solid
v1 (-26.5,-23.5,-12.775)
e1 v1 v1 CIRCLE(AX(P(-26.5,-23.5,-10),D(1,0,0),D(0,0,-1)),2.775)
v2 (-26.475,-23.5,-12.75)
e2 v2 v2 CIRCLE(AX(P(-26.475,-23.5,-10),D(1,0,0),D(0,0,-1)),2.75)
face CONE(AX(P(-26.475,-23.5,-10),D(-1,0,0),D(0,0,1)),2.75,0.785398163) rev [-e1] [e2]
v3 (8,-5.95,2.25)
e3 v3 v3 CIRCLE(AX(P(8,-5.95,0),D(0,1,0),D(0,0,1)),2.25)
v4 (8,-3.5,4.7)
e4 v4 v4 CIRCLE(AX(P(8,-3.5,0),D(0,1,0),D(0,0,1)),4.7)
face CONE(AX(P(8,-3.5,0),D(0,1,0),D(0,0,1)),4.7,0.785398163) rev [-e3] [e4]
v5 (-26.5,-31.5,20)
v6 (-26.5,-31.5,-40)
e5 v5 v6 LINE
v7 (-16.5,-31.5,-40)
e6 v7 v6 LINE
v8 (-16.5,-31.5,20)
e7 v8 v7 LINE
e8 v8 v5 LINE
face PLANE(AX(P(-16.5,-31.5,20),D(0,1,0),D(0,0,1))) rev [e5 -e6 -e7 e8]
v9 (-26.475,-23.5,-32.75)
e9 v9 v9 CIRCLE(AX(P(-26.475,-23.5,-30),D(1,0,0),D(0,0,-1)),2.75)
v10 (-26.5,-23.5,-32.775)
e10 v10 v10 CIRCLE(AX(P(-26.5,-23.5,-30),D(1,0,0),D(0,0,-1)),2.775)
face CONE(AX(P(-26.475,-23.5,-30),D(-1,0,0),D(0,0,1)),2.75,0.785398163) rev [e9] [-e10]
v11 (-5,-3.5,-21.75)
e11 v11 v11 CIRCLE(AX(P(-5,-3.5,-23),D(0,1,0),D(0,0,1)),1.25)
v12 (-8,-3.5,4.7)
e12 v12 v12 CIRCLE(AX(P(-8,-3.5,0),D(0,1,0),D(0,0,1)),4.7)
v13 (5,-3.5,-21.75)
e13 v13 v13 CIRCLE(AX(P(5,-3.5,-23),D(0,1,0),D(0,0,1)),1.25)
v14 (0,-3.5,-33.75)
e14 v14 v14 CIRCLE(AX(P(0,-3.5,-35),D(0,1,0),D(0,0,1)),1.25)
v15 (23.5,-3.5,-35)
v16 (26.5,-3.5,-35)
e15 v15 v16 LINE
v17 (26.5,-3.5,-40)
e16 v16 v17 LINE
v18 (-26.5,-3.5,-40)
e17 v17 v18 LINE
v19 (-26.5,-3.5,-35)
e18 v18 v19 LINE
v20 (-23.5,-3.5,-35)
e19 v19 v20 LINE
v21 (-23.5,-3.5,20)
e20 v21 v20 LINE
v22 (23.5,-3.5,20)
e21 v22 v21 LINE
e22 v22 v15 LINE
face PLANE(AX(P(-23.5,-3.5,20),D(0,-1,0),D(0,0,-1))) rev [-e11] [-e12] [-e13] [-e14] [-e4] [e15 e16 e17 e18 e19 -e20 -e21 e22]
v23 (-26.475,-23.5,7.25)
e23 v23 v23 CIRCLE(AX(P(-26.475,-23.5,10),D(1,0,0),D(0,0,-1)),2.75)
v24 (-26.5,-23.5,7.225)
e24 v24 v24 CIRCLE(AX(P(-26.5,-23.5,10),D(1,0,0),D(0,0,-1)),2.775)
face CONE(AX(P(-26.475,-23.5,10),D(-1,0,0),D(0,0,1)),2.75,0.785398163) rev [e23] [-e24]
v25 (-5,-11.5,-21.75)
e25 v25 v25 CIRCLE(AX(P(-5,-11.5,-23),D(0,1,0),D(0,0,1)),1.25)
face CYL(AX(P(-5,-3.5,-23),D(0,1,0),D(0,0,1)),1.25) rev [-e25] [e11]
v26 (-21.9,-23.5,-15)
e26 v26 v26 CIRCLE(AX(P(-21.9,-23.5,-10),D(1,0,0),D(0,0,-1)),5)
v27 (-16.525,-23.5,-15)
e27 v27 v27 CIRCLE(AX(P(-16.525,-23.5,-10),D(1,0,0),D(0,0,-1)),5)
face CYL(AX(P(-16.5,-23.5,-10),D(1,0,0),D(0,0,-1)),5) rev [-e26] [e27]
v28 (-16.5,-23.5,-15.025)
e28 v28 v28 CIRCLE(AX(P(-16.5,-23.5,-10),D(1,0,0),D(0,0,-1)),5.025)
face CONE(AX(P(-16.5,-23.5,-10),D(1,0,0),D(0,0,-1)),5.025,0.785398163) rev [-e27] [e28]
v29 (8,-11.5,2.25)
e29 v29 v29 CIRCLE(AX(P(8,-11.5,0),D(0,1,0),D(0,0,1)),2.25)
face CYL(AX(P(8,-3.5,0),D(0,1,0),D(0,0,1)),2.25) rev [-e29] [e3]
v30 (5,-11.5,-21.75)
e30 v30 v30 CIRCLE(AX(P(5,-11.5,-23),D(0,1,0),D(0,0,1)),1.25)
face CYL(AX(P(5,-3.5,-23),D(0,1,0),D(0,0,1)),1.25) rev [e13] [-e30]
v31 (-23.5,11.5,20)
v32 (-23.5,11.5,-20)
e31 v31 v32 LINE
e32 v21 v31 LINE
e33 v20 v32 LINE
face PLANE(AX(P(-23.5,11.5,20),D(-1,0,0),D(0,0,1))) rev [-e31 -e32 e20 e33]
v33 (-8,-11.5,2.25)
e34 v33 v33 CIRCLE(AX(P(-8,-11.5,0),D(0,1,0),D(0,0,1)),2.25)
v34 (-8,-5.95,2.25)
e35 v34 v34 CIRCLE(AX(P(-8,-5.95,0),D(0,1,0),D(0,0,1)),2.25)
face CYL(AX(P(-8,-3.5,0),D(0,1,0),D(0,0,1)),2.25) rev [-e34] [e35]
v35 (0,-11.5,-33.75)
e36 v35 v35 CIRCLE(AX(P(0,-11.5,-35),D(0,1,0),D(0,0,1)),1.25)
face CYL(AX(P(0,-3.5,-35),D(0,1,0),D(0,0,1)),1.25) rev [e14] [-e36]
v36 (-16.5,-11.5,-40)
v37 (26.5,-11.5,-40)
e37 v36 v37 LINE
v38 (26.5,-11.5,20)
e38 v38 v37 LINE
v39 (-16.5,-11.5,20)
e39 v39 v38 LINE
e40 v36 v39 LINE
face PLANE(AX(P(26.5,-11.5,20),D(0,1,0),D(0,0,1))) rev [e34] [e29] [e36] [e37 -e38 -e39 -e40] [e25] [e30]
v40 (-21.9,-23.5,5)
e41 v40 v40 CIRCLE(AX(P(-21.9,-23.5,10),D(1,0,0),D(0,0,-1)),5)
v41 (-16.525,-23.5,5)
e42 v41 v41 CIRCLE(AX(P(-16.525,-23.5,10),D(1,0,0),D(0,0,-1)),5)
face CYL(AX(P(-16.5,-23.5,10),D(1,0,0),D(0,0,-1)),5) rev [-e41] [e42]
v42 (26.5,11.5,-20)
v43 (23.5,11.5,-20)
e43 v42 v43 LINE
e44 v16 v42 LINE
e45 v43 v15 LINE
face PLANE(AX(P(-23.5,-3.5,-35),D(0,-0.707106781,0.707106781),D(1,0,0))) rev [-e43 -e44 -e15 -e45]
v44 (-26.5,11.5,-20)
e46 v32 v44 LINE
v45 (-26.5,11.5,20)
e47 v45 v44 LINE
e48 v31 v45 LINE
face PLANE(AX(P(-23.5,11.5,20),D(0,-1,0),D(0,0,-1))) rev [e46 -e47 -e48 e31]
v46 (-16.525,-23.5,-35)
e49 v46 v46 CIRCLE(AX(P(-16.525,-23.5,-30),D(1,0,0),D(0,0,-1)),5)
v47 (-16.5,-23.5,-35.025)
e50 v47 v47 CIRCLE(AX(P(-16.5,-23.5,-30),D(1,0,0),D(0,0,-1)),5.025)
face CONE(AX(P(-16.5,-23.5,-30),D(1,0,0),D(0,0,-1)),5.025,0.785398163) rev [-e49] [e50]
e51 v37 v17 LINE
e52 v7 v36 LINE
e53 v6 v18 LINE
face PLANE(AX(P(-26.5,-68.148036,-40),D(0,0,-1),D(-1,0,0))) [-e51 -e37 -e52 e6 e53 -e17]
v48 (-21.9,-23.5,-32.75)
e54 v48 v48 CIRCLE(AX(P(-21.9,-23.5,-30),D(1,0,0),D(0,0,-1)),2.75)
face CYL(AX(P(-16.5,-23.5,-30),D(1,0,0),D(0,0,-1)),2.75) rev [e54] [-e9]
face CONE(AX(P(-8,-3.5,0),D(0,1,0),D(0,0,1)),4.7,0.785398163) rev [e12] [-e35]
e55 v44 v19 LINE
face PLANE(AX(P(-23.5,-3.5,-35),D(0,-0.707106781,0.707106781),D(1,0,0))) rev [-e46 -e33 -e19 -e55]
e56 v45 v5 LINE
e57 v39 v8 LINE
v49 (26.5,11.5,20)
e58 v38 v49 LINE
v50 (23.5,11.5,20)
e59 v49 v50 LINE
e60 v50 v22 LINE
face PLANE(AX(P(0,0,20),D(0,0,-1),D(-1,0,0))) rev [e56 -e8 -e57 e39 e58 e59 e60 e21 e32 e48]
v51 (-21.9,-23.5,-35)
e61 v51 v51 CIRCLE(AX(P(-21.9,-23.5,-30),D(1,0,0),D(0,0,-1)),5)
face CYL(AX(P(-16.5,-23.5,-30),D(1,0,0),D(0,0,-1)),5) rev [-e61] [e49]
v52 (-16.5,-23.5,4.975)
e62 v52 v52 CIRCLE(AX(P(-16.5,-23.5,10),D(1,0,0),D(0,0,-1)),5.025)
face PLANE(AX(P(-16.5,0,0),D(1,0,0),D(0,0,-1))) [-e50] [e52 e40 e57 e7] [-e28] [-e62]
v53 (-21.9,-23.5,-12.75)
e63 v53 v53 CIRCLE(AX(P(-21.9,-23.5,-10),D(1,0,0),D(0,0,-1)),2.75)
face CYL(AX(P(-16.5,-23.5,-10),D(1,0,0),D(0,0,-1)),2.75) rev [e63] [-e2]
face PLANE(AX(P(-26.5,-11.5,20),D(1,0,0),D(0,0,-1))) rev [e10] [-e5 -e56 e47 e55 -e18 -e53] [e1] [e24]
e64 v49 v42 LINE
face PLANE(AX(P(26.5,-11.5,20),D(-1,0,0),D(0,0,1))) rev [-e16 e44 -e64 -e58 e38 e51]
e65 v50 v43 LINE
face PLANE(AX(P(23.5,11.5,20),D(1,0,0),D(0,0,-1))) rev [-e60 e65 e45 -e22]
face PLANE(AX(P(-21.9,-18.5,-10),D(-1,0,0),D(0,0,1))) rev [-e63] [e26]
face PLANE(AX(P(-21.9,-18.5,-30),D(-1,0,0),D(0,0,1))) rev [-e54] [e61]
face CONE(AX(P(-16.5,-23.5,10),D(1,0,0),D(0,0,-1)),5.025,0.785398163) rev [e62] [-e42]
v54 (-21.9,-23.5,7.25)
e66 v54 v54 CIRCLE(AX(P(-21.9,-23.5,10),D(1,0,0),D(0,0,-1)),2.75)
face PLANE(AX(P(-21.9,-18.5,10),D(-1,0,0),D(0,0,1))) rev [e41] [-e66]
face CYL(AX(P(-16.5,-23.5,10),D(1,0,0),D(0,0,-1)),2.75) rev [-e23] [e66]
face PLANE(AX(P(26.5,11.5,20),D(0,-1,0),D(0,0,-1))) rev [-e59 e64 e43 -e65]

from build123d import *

# Parameters (mm, degrees)
BOSS_EXTRUDE1_DEPTH                                 = 20
SKETCH2_W                                           = 53
SKETCH2_H                                           = 20
BOSS_EXTRUDE2_DEPTH                                 = 8
SKETCH11_W                                          = 60
SKETCH11_H                                          = 20
BOSS_EXTRUDE3_DEPTH                                 = 10
M3_TAPPED_HOLE1_D                                   = 2.5
CSK_FOR_M4_COUNTERSUNK_FLAT_HEAD_SCREW1_D           = 4.5
CSK_FOR_M4_COUNTERSUNK_FLAT_HEAD_SCREW1_CSINK_D     = 9.4
CSK_FOR_M4_COUNTERSUNK_FLAT_HEAD_SCREW1_CSINK_ANGLE = 90
CHAMFER1_SIZE                                       = 15
CBORE_FOR_M5_HEX_SOCKET_HEAD_CAP_SCR_2_COUNT        = 2
CBORE_FOR_M5_HEX_SOCKET_HEAD_CAP_SCR_2_PITCH        = 20
CBORE_FOR_M5_HEX_SOCKET_HEAD_CAP_SCR_3_COUNT        = 2
CBORE_FOR_M5_HEX_SOCKET_HEAD_CAP_SCR_3_PITCH        = 40


with BuildPart() as part:
    # Sketch1 → Boss-Extrude1 (new, symmetric)
    with BuildSketch(Plane.XY):
        Polygon((-23.5, 11.5), (-23.5, -3.5), (23.5, -3.5), (23.5, 11.5), (26.5, 11.5), (26.5, -11.5), (-26.5, -11.5), (-26.5, 11.5), align=None)
    extrude(amount=BOSS_EXTRUDE1_DEPTH, both=True)

    # Sketch2 → Boss-Extrude2 (add)
    with BuildSketch(Plane(origin=(0, -3.5, 0), x_dir=(1, 0, 0), z_dir=(0, 1, 0))):
        with Locations((0, 30)):
            Rectangle(SKETCH2_W, SKETCH2_H)
    extrude(amount=-BOSS_EXTRUDE2_DEPTH)

    # Sketch11 → Boss-Extrude3 (add)
    with BuildSketch(Plane(origin=(-26.5, 0, 0), x_dir=(0, 0, -1), z_dir=(1, 0, 0))):
        with Locations((10, -21.5)):
            Rectangle(SKETCH11_W, SKETCH11_H)
    extrude(amount=BOSS_EXTRUDE3_DEPTH)

    # M3 Tapped Hole1 (through all)
    with Locations(Plane(origin=(0, -3.5, 0), x_dir=(1, 0, 0), z_dir=(0, 1, 0))):
        with Locations((0, 35), (-5, 23), (5, 23)):
            Hole(M3_TAPPED_HOLE1_D / 2)

    # CSK for M4 Countersunk Flat Head Screw1 (through all)
    with Locations(Plane(origin=(0, -3.5, 0), x_dir=(1, 0, 0), z_dir=(0, 1, 0))):
        with Locations((-8, 0), (8, 0)):
            CounterSinkHole(CSK_FOR_M4_COUNTERSUNK_FLAT_HEAD_SCREW1_D / 2, CSK_FOR_M4_COUNTERSUNK_FLAT_HEAD_SCREW1_CSINK_D / 2, counter_sink_angle=CSK_FOR_M4_COUNTERSUNK_FLAT_HEAD_SCREW1_CSINK_ANGLE)

    # Chamfer1
    chamfer1_edges = [part.edges().sort_by_distance(p)[0] for p in [
        (-25, -3.5, -20),
        (25, -3.5, -20),
    ]]
    chamfer(chamfer1_edges, length=CHAMFER1_SIZE - 0.0001)  # a hair under: the kernel refuses the full size

    # Sketch14 → CBORE for M5 Hex Socket Head Cap Screw1 (revolve, cut)
    with BuildSketch(Plane(origin=(-16.5, -23.5, -30), x_dir=(0, 0, -1), z_dir=(0, 1, 0))):
        Polygon((0, 0), (0, 10), (2.775, 10), (2.75, 9.975), (2.75, 5.4), (5, 5.4), (5, 0.025), (5.025, 0), align=None)
    cbore_for_m5_hex_socket_head_cap_screw1 = revolve(axis=Axis((-10.15, -23.5, -30), (-1, 0, 0)), mode=Mode.SUBTRACT)

    # CBORE for M5 Hex Socket Head Cap Scr 2: CBORE for M5 Hex Socket Head Cap Screw1 ×2
    with Locations(*[(0, 0, i * CBORE_FOR_M5_HEX_SOCKET_HEAD_CAP_SCR_2_PITCH) for i in range(1, CBORE_FOR_M5_HEX_SOCKET_HEAD_CAP_SCR_2_COUNT)]):
        add(cbore_for_m5_hex_socket_head_cap_screw1, mode=Mode.SUBTRACT)

    # CBORE for M5 Hex Socket Head Cap Scr 3: CBORE for M5 Hex Socket Head Cap Screw1 ×2
    with Locations(*[(0, 0, i * CBORE_FOR_M5_HEX_SOCKET_HEAD_CAP_SCR_3_PITCH) for i in range(1, CBORE_FOR_M5_HEX_SOCKET_HEAD_CAP_SCR_3_COUNT)]):
        add(cbore_for_m5_hex_socket_head_cap_screw1, mode=Mode.SUBTRACT)


solid = part.part
